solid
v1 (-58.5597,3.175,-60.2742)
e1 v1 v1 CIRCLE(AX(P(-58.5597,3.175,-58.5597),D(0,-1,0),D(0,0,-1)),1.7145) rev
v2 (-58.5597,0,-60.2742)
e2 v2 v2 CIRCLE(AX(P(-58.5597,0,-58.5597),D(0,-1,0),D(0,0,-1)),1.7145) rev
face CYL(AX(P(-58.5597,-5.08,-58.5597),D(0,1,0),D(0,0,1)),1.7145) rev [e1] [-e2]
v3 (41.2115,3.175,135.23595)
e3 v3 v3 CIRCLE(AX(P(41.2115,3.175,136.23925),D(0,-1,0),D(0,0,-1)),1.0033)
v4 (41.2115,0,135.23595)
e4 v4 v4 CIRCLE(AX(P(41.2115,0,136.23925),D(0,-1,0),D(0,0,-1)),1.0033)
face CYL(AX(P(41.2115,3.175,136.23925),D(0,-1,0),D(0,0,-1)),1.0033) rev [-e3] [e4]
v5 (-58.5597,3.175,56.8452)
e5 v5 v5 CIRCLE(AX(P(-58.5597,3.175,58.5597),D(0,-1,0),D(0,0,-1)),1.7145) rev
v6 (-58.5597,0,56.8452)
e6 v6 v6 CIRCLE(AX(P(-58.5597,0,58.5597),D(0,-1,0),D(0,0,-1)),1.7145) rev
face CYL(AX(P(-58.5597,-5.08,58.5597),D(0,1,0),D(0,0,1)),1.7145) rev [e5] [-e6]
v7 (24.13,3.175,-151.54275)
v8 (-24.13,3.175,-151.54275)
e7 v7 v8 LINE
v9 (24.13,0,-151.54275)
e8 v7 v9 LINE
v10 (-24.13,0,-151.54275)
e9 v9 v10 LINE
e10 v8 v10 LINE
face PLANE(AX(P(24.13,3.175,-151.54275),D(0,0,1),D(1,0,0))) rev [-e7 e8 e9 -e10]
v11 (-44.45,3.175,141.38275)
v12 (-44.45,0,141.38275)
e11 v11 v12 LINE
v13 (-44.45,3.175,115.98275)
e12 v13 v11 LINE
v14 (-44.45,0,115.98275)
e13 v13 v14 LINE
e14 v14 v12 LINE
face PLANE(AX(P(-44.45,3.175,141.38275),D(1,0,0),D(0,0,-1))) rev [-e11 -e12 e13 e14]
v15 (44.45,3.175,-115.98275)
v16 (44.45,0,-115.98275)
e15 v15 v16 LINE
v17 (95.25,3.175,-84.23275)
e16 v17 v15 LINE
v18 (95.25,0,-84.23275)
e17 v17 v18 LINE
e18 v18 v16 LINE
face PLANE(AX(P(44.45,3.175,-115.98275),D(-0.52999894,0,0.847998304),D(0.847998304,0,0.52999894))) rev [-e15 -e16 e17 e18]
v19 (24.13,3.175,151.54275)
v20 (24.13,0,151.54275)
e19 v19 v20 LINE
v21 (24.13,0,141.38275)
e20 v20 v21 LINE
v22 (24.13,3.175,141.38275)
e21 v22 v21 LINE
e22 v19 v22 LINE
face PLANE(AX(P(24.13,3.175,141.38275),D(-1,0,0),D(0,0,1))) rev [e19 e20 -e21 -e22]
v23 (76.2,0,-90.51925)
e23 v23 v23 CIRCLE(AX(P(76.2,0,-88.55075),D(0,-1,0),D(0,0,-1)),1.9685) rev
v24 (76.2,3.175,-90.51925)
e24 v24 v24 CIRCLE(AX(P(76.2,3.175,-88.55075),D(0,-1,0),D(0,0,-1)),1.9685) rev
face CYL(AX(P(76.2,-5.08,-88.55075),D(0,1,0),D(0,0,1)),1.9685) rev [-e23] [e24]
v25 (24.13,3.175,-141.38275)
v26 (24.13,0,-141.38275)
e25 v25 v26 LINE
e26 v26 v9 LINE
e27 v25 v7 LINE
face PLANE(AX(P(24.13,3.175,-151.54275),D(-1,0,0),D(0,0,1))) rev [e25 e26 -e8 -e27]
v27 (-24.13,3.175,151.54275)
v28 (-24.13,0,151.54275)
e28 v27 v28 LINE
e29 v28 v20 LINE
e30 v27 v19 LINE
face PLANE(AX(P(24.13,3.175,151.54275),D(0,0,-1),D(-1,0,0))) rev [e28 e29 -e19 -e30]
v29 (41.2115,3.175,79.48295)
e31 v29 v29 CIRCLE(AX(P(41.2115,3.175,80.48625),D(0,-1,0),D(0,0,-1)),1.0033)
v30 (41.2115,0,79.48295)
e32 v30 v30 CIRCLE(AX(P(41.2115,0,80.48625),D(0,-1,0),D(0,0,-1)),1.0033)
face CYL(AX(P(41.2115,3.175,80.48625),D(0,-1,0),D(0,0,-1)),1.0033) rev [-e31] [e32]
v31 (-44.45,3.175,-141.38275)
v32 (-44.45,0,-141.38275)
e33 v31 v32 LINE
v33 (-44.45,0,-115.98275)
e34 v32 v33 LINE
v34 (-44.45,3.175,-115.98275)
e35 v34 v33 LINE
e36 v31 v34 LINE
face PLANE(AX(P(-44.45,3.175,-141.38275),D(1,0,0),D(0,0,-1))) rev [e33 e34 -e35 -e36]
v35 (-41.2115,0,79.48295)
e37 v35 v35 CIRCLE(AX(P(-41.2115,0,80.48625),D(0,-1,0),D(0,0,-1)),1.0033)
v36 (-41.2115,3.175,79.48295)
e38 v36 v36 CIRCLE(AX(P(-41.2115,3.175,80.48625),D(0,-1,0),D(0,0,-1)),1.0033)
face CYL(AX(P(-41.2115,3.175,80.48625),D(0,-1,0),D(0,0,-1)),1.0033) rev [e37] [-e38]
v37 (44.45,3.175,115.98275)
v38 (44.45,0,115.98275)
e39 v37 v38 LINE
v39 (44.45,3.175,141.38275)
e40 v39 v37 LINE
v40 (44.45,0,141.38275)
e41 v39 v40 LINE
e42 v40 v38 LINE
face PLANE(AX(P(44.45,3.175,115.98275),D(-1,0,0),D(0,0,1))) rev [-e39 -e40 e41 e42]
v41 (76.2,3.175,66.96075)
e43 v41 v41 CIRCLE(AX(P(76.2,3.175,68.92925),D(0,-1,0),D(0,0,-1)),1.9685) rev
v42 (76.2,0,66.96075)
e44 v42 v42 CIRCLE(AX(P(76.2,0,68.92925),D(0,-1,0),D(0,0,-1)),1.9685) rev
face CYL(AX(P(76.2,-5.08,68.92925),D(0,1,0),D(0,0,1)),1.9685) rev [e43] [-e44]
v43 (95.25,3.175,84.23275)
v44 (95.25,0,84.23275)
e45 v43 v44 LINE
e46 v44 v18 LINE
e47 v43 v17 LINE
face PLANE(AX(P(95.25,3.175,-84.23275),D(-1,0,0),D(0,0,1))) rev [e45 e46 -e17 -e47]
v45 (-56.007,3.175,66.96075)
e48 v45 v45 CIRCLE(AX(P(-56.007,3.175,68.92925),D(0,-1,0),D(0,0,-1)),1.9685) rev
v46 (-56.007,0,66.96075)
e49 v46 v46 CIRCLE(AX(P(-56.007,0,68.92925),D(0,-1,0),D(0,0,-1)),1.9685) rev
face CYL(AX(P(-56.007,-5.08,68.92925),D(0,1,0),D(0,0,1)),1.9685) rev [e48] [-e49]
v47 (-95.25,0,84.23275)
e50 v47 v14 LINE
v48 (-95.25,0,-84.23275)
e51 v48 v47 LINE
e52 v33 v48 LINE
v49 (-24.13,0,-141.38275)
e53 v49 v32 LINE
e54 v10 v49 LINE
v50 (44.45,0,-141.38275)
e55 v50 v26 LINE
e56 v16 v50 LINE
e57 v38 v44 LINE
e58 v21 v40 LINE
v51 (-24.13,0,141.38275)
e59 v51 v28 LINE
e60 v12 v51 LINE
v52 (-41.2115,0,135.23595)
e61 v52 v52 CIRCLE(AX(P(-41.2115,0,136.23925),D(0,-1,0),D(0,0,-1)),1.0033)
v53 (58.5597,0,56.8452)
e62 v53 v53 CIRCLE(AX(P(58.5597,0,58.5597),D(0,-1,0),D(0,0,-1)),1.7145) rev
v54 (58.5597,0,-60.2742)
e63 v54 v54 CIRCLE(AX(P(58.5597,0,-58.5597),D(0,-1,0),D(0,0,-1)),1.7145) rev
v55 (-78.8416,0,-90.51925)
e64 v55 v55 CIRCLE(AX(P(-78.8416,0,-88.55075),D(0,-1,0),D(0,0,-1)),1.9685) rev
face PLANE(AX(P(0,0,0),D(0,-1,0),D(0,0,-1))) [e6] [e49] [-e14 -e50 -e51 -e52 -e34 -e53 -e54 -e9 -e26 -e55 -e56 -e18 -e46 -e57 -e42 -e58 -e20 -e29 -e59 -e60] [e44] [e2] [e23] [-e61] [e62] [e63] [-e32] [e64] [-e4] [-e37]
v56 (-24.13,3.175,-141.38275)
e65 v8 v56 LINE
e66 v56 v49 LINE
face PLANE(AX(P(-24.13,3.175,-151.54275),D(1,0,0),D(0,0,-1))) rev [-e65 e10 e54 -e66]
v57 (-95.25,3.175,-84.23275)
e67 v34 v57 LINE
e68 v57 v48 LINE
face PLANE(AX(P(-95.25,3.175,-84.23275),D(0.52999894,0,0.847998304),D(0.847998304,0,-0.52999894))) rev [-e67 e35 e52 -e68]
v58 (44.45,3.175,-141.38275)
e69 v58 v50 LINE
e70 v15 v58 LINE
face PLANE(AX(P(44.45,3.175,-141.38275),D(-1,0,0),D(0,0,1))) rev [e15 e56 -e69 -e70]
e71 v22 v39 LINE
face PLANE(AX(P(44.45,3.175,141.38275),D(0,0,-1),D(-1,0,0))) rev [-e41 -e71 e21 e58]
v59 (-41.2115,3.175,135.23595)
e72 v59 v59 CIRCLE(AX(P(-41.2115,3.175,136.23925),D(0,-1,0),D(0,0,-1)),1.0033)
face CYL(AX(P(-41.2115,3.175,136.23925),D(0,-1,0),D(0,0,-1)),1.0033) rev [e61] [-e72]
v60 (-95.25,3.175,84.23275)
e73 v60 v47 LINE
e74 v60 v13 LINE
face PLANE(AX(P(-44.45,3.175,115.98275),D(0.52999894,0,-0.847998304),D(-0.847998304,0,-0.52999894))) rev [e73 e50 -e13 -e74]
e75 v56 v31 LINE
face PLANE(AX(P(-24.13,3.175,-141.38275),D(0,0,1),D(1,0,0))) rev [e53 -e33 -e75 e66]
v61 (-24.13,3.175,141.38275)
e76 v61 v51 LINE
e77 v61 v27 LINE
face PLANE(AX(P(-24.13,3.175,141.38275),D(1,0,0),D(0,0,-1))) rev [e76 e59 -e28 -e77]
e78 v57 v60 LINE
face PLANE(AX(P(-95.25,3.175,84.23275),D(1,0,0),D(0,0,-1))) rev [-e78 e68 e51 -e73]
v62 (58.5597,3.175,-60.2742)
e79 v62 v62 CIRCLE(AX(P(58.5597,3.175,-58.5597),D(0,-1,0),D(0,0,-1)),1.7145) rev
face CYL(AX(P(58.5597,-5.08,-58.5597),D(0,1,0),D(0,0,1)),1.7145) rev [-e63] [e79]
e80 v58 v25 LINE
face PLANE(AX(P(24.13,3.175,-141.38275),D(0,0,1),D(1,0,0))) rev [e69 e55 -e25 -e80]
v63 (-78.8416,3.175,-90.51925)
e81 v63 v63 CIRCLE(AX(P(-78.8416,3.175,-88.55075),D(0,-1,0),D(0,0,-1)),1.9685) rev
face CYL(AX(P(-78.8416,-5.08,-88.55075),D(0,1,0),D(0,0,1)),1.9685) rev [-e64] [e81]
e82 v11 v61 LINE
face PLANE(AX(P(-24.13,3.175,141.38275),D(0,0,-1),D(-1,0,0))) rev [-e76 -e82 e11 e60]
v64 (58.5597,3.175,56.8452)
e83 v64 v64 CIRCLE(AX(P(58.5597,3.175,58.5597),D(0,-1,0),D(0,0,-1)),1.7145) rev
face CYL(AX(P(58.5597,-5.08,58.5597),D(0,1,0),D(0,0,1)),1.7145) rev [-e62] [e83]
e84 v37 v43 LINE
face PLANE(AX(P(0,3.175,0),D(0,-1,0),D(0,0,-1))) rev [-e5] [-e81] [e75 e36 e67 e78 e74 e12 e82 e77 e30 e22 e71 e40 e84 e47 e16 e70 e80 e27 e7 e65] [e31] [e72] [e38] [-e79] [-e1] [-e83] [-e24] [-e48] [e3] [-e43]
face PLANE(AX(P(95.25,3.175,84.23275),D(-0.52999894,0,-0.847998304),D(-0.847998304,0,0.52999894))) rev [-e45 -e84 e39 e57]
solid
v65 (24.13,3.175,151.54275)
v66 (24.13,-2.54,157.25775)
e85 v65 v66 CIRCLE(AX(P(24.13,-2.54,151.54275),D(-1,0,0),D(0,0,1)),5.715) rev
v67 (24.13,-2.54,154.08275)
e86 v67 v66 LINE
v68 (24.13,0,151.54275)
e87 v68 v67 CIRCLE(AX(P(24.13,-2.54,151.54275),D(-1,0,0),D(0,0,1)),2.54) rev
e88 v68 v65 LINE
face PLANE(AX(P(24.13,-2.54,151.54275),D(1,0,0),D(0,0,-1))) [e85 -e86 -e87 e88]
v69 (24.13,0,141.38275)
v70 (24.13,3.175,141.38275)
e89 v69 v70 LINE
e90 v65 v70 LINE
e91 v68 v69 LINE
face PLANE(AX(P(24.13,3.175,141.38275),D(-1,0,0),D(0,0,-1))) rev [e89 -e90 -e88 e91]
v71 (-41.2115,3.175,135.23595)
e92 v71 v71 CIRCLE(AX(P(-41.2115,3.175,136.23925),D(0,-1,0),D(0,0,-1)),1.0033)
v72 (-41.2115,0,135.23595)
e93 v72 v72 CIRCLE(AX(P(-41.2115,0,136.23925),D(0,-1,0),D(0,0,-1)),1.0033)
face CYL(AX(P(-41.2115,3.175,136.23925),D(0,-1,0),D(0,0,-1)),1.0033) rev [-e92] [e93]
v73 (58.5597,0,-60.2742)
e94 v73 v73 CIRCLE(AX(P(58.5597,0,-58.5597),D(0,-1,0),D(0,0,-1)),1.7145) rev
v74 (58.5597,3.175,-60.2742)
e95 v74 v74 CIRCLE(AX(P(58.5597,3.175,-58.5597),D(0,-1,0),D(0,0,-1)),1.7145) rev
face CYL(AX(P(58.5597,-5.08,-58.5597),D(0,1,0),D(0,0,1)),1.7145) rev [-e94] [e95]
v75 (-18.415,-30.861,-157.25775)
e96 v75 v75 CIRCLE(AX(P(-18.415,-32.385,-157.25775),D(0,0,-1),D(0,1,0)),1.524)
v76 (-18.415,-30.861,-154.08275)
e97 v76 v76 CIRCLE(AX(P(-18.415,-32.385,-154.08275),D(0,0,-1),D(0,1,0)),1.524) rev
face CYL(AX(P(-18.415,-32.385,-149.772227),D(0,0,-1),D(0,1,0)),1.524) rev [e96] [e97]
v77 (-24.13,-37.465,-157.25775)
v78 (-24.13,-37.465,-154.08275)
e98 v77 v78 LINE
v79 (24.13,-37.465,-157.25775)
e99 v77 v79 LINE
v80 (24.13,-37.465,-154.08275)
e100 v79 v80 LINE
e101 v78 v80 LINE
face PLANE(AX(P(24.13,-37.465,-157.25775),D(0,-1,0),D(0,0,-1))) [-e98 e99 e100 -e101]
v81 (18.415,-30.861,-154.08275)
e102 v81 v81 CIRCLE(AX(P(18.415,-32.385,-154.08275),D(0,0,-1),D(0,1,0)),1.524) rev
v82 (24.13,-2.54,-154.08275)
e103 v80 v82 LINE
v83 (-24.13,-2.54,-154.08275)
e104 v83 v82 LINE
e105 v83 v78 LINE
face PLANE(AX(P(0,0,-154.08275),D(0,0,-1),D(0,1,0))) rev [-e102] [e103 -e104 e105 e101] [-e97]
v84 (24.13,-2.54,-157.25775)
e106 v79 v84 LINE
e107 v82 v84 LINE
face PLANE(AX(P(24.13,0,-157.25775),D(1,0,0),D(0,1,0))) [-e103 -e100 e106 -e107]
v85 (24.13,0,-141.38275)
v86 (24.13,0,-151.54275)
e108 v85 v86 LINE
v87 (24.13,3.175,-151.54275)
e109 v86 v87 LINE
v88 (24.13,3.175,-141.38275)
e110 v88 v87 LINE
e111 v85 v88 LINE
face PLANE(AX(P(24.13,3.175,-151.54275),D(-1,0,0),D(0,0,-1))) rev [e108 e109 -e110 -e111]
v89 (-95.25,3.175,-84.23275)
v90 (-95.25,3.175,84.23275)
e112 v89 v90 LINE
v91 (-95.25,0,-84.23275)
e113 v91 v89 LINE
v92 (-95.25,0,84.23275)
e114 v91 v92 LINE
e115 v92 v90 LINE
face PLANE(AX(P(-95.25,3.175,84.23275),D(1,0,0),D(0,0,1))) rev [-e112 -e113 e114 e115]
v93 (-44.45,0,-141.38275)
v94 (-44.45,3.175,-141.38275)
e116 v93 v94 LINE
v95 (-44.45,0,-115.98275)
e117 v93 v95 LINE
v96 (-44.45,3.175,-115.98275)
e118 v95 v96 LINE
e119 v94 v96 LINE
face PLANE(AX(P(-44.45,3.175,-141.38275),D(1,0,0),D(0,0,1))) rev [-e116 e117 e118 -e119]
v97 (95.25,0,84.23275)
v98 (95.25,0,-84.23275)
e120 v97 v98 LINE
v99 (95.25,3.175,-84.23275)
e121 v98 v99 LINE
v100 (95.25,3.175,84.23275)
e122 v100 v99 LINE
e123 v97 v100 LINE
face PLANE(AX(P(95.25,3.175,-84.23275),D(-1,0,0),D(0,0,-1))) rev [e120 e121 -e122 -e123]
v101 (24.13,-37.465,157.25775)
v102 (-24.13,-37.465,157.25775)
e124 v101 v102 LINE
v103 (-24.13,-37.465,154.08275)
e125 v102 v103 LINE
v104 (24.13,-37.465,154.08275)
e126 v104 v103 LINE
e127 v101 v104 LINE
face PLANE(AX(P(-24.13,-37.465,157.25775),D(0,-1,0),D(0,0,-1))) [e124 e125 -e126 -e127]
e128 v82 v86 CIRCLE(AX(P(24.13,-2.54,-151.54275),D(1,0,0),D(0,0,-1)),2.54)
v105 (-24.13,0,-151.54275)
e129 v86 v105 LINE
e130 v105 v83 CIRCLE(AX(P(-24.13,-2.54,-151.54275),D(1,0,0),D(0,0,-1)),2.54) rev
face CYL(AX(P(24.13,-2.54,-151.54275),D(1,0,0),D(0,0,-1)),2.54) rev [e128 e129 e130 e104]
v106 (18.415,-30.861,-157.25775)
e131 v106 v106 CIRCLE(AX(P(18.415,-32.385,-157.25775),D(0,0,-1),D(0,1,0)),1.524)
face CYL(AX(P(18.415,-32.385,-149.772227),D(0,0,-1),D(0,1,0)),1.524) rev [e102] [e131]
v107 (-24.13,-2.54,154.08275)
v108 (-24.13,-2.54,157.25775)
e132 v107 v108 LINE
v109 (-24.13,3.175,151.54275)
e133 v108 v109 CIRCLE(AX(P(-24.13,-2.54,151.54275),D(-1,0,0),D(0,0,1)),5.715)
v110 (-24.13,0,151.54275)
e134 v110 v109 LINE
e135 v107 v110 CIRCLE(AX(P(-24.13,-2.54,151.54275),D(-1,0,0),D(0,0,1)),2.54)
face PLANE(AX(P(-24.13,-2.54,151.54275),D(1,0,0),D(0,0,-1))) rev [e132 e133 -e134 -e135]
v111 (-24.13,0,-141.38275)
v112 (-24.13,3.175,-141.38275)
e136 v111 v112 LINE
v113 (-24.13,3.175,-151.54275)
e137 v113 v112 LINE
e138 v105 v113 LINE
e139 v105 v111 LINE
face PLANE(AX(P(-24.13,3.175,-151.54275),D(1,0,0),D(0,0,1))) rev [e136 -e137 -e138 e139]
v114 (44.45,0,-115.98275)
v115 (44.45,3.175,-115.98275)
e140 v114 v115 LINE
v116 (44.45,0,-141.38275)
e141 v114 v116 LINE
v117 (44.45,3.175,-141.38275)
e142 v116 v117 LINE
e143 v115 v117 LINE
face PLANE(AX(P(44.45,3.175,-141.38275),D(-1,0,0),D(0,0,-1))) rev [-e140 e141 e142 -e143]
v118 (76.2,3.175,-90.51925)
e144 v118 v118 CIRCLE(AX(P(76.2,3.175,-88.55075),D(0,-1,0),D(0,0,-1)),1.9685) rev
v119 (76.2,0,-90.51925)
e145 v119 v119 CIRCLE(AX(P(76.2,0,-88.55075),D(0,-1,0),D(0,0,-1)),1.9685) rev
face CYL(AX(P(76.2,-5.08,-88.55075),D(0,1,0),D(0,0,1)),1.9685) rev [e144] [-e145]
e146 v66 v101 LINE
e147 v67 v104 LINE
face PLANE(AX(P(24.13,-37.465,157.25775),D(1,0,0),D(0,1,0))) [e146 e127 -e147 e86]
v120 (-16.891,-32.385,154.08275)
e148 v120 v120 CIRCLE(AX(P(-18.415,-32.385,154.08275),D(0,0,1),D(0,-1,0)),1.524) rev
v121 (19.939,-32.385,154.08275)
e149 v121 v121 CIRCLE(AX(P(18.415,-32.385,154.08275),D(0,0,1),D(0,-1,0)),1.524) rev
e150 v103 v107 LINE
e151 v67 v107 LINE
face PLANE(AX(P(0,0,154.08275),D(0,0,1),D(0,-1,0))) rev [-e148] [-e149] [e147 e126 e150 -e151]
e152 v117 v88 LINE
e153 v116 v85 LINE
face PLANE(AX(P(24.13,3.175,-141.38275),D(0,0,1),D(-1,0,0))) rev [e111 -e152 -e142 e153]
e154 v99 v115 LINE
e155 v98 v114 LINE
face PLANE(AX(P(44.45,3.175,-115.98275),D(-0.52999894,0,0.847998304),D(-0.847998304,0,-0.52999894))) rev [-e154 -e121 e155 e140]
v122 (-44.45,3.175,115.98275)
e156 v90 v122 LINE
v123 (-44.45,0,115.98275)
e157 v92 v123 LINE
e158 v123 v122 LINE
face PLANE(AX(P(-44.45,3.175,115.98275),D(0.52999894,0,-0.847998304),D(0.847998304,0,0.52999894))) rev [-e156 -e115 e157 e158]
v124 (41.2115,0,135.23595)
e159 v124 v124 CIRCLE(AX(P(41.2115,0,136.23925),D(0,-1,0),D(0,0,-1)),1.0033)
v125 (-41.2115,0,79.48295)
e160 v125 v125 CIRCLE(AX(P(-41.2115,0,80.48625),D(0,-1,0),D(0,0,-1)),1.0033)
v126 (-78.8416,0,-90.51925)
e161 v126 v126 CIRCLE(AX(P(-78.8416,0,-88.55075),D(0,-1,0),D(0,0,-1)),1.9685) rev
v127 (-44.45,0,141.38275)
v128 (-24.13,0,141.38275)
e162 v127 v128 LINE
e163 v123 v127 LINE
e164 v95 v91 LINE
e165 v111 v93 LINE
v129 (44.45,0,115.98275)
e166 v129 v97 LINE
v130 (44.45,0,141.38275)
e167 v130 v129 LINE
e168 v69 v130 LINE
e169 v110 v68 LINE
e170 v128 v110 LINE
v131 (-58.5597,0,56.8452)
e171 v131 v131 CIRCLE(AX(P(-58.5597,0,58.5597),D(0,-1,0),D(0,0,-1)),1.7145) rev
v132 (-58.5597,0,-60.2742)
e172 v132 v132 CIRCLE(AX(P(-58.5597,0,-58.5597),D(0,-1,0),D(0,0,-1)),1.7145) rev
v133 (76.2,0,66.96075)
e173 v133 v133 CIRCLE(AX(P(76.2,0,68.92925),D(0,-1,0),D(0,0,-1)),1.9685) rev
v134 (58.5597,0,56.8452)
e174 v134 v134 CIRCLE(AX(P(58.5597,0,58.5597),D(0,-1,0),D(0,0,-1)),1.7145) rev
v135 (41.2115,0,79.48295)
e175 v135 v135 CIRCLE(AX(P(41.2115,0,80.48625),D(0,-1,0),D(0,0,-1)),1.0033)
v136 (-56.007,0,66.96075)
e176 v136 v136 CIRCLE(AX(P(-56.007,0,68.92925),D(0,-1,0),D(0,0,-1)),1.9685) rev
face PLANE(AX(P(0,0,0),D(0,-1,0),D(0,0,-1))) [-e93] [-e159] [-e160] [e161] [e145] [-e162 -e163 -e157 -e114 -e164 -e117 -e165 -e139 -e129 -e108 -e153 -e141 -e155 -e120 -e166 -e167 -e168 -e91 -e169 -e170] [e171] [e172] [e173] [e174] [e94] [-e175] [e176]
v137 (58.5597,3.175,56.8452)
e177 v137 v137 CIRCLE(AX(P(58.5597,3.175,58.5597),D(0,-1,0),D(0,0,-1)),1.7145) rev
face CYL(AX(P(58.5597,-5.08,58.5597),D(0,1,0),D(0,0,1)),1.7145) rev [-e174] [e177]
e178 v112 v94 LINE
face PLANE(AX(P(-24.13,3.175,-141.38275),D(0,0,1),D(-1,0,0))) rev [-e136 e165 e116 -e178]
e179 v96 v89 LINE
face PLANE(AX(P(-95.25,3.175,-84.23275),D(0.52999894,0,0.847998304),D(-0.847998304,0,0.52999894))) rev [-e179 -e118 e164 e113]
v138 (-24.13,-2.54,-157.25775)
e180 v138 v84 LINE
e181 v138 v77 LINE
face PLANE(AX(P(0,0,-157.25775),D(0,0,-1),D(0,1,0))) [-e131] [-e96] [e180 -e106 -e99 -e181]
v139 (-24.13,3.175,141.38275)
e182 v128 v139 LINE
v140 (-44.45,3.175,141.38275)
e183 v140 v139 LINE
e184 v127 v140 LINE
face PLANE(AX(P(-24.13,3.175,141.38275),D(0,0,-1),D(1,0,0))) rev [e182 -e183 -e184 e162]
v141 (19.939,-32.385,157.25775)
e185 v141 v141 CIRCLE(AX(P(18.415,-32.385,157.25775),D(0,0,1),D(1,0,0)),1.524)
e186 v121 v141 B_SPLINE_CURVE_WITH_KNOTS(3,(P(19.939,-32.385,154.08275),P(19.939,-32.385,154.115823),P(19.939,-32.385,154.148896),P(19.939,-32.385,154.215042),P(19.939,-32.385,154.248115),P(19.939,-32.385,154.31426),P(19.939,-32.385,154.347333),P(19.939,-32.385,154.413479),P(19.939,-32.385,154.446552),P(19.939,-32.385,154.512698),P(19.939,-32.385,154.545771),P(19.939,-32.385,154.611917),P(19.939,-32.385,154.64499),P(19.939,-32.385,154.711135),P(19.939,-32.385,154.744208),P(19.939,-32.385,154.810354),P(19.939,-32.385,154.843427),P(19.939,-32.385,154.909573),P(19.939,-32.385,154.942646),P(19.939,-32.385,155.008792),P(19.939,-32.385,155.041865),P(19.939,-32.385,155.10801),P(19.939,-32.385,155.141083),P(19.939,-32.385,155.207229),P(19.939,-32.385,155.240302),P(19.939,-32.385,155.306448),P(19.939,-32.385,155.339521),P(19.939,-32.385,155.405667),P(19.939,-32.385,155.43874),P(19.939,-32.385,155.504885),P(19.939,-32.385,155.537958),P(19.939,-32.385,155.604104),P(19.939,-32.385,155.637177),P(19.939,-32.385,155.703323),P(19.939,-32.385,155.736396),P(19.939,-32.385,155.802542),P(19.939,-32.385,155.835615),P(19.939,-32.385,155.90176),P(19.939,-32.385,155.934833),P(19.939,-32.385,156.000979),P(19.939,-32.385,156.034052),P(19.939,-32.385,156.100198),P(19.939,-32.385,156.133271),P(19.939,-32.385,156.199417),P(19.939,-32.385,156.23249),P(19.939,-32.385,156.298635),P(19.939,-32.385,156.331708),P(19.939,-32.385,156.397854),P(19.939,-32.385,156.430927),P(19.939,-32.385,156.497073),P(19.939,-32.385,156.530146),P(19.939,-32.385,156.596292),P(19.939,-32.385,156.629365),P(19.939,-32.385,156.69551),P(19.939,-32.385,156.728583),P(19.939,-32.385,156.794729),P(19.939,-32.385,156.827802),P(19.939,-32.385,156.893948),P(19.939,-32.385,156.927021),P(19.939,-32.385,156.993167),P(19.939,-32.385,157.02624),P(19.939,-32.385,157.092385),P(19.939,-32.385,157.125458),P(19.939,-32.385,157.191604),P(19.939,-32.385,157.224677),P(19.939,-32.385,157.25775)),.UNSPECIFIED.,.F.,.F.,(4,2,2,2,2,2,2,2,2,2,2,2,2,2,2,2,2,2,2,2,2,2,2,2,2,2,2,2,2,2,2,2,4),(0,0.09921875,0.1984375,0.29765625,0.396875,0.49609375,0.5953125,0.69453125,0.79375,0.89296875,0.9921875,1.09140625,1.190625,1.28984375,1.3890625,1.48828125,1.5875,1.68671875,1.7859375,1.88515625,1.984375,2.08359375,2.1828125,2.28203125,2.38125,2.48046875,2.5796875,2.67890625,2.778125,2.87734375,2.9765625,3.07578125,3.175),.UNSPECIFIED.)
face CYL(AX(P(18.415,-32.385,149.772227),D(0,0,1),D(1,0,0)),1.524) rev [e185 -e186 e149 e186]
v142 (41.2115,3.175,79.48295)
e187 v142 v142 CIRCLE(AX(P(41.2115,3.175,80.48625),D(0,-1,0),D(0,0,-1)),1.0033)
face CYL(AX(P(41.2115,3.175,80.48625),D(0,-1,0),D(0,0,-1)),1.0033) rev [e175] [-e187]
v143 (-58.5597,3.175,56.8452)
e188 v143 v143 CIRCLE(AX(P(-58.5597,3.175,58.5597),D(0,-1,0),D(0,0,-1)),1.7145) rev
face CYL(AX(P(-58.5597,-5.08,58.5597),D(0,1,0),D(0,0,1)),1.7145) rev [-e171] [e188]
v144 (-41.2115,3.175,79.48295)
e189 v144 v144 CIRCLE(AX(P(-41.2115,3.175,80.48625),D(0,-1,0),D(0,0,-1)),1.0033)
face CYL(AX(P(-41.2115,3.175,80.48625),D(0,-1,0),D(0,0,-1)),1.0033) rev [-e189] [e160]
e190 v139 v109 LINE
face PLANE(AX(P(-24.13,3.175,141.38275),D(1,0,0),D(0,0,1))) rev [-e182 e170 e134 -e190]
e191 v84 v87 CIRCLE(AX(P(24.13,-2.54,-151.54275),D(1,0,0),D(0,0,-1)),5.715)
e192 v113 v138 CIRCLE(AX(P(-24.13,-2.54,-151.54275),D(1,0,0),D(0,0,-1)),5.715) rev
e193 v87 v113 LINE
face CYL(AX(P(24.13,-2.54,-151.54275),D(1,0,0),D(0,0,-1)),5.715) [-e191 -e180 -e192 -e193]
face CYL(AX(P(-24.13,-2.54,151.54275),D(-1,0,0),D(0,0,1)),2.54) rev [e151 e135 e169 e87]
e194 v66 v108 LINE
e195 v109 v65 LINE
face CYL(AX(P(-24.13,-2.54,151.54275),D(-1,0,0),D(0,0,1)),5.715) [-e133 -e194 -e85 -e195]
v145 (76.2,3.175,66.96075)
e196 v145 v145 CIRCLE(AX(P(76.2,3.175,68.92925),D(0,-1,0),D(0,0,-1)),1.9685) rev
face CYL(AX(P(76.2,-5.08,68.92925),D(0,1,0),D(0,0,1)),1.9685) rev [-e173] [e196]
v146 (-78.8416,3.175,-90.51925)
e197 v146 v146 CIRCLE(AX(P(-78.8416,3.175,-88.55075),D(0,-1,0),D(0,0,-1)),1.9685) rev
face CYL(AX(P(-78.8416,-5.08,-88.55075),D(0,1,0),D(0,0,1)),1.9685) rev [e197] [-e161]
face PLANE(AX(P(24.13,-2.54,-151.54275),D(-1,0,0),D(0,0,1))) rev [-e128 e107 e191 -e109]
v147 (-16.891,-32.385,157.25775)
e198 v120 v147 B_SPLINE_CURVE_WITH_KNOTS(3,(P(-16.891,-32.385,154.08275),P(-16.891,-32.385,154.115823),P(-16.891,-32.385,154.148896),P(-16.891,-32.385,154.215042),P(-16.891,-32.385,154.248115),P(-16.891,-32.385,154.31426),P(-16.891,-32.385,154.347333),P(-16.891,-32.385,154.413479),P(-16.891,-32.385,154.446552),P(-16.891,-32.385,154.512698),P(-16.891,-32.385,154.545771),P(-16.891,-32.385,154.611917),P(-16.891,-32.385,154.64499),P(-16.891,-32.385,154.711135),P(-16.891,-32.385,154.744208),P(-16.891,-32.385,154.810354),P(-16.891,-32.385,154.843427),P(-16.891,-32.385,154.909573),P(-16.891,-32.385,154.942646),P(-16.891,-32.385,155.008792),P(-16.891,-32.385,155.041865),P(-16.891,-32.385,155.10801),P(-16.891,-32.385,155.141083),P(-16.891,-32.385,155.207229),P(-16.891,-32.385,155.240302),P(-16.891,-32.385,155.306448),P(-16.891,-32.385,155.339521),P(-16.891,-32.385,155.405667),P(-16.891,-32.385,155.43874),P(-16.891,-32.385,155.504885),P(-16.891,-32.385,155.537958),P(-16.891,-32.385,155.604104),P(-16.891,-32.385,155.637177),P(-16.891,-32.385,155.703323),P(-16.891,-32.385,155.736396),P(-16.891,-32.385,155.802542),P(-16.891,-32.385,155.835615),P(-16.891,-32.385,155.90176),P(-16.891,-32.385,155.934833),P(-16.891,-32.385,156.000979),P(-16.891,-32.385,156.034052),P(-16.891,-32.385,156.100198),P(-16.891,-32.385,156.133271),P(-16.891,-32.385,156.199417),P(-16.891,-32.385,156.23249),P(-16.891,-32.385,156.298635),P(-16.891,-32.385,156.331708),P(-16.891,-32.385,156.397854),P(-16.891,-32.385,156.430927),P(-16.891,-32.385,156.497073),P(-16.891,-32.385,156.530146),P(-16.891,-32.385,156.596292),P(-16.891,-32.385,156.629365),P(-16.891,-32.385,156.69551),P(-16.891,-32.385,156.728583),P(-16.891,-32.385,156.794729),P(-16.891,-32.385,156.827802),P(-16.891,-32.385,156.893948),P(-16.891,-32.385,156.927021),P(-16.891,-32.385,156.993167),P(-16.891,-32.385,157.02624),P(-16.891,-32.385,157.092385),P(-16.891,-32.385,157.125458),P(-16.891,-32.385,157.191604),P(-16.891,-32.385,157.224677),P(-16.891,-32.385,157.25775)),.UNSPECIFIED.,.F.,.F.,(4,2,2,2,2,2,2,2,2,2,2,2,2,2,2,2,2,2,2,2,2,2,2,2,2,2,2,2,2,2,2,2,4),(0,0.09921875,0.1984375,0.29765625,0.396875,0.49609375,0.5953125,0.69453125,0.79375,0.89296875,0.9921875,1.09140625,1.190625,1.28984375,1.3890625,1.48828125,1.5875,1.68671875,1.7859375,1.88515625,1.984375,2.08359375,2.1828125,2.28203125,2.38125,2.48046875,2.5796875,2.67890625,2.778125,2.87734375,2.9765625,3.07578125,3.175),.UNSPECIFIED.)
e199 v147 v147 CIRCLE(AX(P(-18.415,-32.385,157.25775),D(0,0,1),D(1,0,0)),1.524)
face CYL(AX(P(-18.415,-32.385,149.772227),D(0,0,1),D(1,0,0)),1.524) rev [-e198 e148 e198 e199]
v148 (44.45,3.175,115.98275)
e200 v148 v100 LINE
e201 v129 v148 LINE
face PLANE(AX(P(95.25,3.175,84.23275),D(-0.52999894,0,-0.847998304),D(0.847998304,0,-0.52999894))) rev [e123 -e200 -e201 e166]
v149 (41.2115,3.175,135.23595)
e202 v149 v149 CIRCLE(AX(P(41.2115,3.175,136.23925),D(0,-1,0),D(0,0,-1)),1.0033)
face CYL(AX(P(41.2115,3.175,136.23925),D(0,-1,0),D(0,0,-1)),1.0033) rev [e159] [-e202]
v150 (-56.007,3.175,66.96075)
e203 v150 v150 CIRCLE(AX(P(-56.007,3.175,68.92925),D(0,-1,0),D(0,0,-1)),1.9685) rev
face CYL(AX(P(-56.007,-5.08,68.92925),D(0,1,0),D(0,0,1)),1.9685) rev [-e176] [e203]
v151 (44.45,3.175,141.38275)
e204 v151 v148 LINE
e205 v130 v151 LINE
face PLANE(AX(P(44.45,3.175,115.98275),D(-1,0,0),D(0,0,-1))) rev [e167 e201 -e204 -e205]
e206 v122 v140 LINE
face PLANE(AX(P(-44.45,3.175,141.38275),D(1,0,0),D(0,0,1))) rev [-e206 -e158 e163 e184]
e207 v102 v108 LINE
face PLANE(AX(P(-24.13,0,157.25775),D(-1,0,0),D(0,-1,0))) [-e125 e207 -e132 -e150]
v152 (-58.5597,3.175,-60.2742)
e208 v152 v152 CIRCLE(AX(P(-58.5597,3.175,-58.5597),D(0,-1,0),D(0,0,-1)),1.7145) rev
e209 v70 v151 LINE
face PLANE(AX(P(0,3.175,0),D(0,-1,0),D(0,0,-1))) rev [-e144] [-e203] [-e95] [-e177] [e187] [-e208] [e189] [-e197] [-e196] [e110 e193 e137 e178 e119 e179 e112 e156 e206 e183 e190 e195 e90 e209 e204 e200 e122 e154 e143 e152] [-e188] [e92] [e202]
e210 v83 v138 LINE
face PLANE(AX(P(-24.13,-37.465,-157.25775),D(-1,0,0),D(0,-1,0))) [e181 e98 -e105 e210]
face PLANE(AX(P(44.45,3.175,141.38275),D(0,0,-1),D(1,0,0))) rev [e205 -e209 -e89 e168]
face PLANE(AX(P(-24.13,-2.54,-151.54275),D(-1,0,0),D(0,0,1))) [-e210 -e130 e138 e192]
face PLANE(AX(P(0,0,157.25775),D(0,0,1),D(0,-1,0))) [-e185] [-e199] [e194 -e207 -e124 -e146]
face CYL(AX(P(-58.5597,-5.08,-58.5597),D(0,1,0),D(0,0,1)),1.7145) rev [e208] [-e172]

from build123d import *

# Parameters (mm, degrees)
BOSS_EXTRUDE1_DEPTH     = 3.175
CONVERT_SOLID1_DEPTH    = 3.175
EDGE_FLANGE3_DEPTH      = 48.26
EDGE_FLANGE3_BEND_DEPTH = 48.26
SKETCH23_R              = 1.9685000000000155
SKETCH23_R_2            = 1.968500000000002
CUT_EXTRUDE4_DEPTH      = 5.08
SKETCH24_R              = 1.0032999999999983
SKETCH24_R_2            = 1.0032999999999943
CUT_EXTRUDE5_DEPTH      = 188.63312250256496
SKETCH30_R              = 1.524000000000002
CUT_EXTRUDE6_DEPTH      = 3.175
SKETCH27_R              = 1.524000000000002
CUT_EXTRUDE7_DEPTH      = 3.175


# Read off the part's stored shape, not the designer's step: Convert-Solid1
# Sheet-metal steps are written as plain solids
with BuildPart() as part:
    # Sketch2 → Boss-Extrude1 (new body)
    with BuildSketch(Plane(origin=(0, 0, 0), x_dir=(1, 0, 0), z_dir=(0, 1, 0))):
        Polygon((44.45000000000084, 115.98275000000001), (95.25000000000001, 84.23274999999997), (95.25000000000001, -84.23274999999997), (44.45000000000084, -115.98275000000001), (44.450000000000905, -141.38275), (24.130000000000035, -141.38275), (24.13, -151.54274999999998), (-24.13, -151.54274999999998), (-24.129999999999963, -141.38275), (-44.450000000000834, -141.38275), (-44.45000000000083, -115.98275), (-95.24999999999996, -84.23275), (-95.24999999999996, 84.23275), (-44.45000000000083, 115.98275), (-44.450000000000905, 141.38275), (-24.130000000000035, 141.38275), (-24.13, 151.54274999999998), (24.13, 151.54274999999998), (24.130000000000035, 141.38275), (44.450000000000905, 141.38275), align=None)
    extrude(amount=BOSS_EXTRUDE1_DEPTH)


with BuildPart() as body_2:
    # Convert-Solid1 outline → Convert-Solid1 (new body)
    with BuildSketch(Plane(origin=(0, 0, 0), x_dir=(1, 0, 0), z_dir=(0, 1, 0))):
        Polygon((-24.13, -141.38275), (-24.13, -151.54275), (24.13, -151.54275), (24.13, -141.38275), (44.45, -141.38275), (44.45, -115.98275), (95.25, -84.23275), (95.25, 84.23275), (44.45, 115.98275), (44.45, 141.38275), (24.13, 141.38275), (24.13, 151.54275), (-24.13, 151.54275), (-24.13, 141.38275), (-44.45, 141.38275), (-44.45, 115.98275), (-95.25, 84.23275), (-95.25, -84.23275), (-44.45, -115.98275), (-44.45, -141.38275), align=None)
    extrude(amount=CONVERT_SOLID1_DEPTH)

    # Edge-Flange3 section (across the edge) → Edge-Flange3 (add)
    with BuildSketch(Plane(origin=(24.13, 1.774e-14, 154.08275), x_dir=(0, -3.49e-15, -1), z_dir=(-1, 0, 0))):
        with BuildLine():
            Line((-3.175, 2.540000000000009), (-3.175, 37.46500000000001))
            Line((-3.175, 37.46500000000001), (0, 37.46500000000001))
            Line((0, 37.46500000000001), (0, 2.540000000000009))
            ThreePointArc((0, 2.540000000000009), (0.7439487757861725, 0.7439487757861749), (2.540000000000009, 8.88e-15))
            Line((2.540000000000009, 8.88e-15), (2.54000000000002, -3.174999999999991))
            ThreePointArc((2.54000000000002, -3.174999999999991), (-1.5011152544811113, -1.5011152544811175), (-3.175, 2.540000000000009))
        make_face()
    extrude(amount=EDGE_FLANGE3_DEPTH)

    # Edge-Flange3 section 2 (across the edge) → Edge-Flange3 bend (add)
    with BuildSketch(Plane(origin=(-24.13, 1.774e-14, -154.08275), x_dir=(0, -3.49e-15, 1), z_dir=(1, 0, 0))):
        with BuildLine():
            Line((-3.175, 2.540000000000009), (-3.175, 37.46500000000001))
            Line((-3.175, 37.46500000000001), (0, 37.46500000000001))
            Line((0, 37.46500000000001), (0, 2.540000000000009))
            ThreePointArc((0, 2.540000000000009), (0.7439487757861725, 0.7439487757861749), (2.540000000000009, 8.88e-15))
            Line((2.540000000000009, 8.88e-15), (2.54000000000002, -3.174999999999991))
            ThreePointArc((2.54000000000002, -3.174999999999991), (-1.5011152544811113, -1.5011152544811175), (-3.175, 2.540000000000009))
        make_face()
    extrude(amount=EDGE_FLANGE3_BEND_DEPTH)


with BuildPart() as cut_extrude4_tool:
    # Sketch23 → Cut-Extrude4 (new, symmetric)
    with BuildSketch(Plane(origin=(0, 0, 0), x_dir=(-1, 0, 0), z_dir=(0, -1, 0))):
        with Locations(Location((78.84159999999999, 88.55075000000001, 0), (0, 0, 90))):
            Circle(SKETCH23_R)
        with Locations(Location((-76.20000000000002, 88.55075000000001, 0), (0, 0, 90))):
            Circle(SKETCH23_R_2)
        with BuildLine():
            Line((-58.55969999999999, 56.84519999999998), (-58.55969999999999, 58.55969999999998))
            Line((-58.55969999999999, 58.55969999999998), (-56.84519999999999, 58.55969999999998))
            ThreePointArc((-56.84519999999999, 58.55969999999998), (-59.772034576344325, 59.77203457634431), (-58.55969999999999, 56.84519999999998))
        make_face()
        with BuildLine():
            Line((-56.84519999999999, 58.55969999999998), (-58.55969999999999, 58.55969999999998))
            Line((-58.55969999999999, 58.55969999999998), (-58.55969999999999, 56.84519999999998))
            ThreePointArc((-58.55969999999999, 56.84519999999998), (-57.34736542365566, 57.34736542365564), (-56.84519999999999, 58.55969999999998))
        make_face()
        with BuildLine():
            ThreePointArc((60.27419999999999, 58.55969999999998), (58.55969999999999, 60.27419999999998), (56.84519999999999, 58.55969999999998))
            Line((56.84519999999999, 58.55969999999998), (58.55969999999999, 58.55969999999998))
            Line((58.55969999999999, 58.55969999999998), (58.55969999999999, 56.84519999999998))
            ThreePointArc((58.55969999999999, 56.84519999999998), (59.772034576344325, 57.34736542365564), (60.27419999999999, 58.55969999999998))
        make_face()
        with BuildLine():
            Line((58.55969999999999, 58.55969999999998), (56.84519999999999, 58.55969999999998))
            ThreePointArc((56.84519999999999, 58.55969999999998), (57.34736542365565, 57.347365423655646), (58.55969999999999, 56.84519999999998))
            Line((58.55969999999999, 56.84519999999998), (58.55969999999999, 58.55969999999998))
        make_face()
        with BuildLine():
            ThreePointArc((-56.84519999999998, -58.55970000000001), (-57.347365423655646, -57.347365423655674), (-58.55969999999998, -56.845200000000006))
            Line((-58.55969999999998, -56.845200000000006), (-58.55969999999998, -58.55970000000001))
            Line((-58.55969999999998, -58.55970000000001), (-56.84519999999998, -58.55970000000001))
        make_face()
        with BuildLine():
            Line((-58.55969999999998, -58.55970000000001), (-58.55969999999998, -56.845200000000006))
            ThreePointArc((-58.55969999999998, -56.845200000000006), (-59.77203457634432, -59.77203457634434), (-56.84519999999998, -58.55970000000001))
            Line((-56.84519999999998, -58.55970000000001), (-58.55969999999998, -58.55970000000001))
        make_face()
        with Locations(Location((-76.20000000000002, -68.92925, 0), (0, 0, 90))):
            Circle(SKETCH23_R_2)
        with BuildLine():
            ThreePointArc((60.27420000000001, -58.55970000000001), (59.77203457634434, -57.347365423655674), (58.55970000000001, -56.845200000000006))
            Line((58.55970000000001, -56.845200000000006), (58.55970000000001, -58.55970000000001))
            Line((58.55970000000001, -58.55970000000001), (56.845200000000006, -58.55970000000001))
            ThreePointArc((56.845200000000006, -58.55970000000001), (58.55970000000001, -60.27420000000001), (60.27420000000001, -58.55970000000001))
        make_face()
        with BuildLine():
            Line((58.55970000000001, -58.55970000000001), (58.55970000000001, -56.845200000000006))
            ThreePointArc((58.55970000000001, -56.845200000000006), (57.347365423655674, -57.347365423655674), (56.845200000000006, -58.55970000000001))
            Line((56.845200000000006, -58.55970000000001), (58.55970000000001, -58.55970000000001))
        make_face()
        with Locations(Location((56.00699999999998, -68.92925, 0), (0, 0, 90))):
            Circle(SKETCH23_R)
    extrude(amount=CUT_EXTRUDE4_DEPTH, both=True)


with BuildPart() as part_1:
    add(part.part)

    # Cut-Extrude4: cut by cut_extrude4_tool
    add(cut_extrude4_tool.part, mode=Mode.SUBTRACT)


with BuildPart() as body_2_1:
    add(body_2.part)

    # Cut-Extrude4: cut by cut_extrude4_tool
    add(cut_extrude4_tool.part, mode=Mode.SUBTRACT)


with BuildPart() as cut_extrude5_tool:
    # Sketch24 → Cut-Extrude5 (new, through all)
    with BuildSketch(Plane(origin=(0, 0, 0), x_dir=(-1, 0, 0), z_dir=(0, -1, 0))):
        with Locations(Location((41.211500000000015, -136.23924999999994, 0), (0, 0, 90))):
            Circle(SKETCH24_R)
        with Locations(Location((-41.21149999999999, -136.23924999999994, 0), (0, 0, 90))):
            Circle(SKETCH24_R)
        with Locations(Location((-41.21149999999999, -80.48624999999994, 0), (0, 0, 90))):
            Circle(SKETCH24_R_2)
        with Locations(Location((41.211500000000015, -80.48624999999996, 0), (0, 0, 90))):
            Circle(SKETCH24_R_2)
    extrude(amount=-CUT_EXTRUDE5_DEPTH)


with BuildPart() as part_2:
    add(part_1.part)

    # Cut-Extrude5: cut by cut_extrude5_tool
    add(cut_extrude5_tool.part, mode=Mode.SUBTRACT)


with BuildPart() as body_2_2:
    add(body_2_1.part)

    # Cut-Extrude5: cut by cut_extrude5_tool
    add(cut_extrude5_tool.part, mode=Mode.SUBTRACT)

    # Sketch30 → Cut-Extrude6 (cut)
    with BuildSketch(Plane(origin=(0, 5.8251e-13, -157.25775), x_dir=(-1, 0, 0), z_dir=(0, 3.7e-15, -1))):
        with Locations(Location((-18.414999999999996, -32.38500000000058, 0), (0, 0, 90))):
            Circle(SKETCH30_R)
        with Locations(Location((18.415, -32.38500000000057, 0), (0, 0, 90))):
            Circle(SKETCH30_R)
    extrude(amount=-CUT_EXTRUDE6_DEPTH, mode=Mode.SUBTRACT)

    # Sketch27 → Cut-Extrude7 (cut)
    with BuildSketch(Plane.XY.offset(157.25775)):
        with Locations(Location((-18.414999999999996, -32.38500000000057, 0), (0, 0, 90))):
            Circle(SKETCH27_R)
        with Locations(Location((18.415, -32.385000000000566, 0), (0, 0, 90))):
            Circle(SKETCH27_R)
    extrude(amount=-CUT_EXTRUDE7_DEPTH, mode=Mode.SUBTRACT)


solid = Compound([part_2.part, body_2_2.part])
